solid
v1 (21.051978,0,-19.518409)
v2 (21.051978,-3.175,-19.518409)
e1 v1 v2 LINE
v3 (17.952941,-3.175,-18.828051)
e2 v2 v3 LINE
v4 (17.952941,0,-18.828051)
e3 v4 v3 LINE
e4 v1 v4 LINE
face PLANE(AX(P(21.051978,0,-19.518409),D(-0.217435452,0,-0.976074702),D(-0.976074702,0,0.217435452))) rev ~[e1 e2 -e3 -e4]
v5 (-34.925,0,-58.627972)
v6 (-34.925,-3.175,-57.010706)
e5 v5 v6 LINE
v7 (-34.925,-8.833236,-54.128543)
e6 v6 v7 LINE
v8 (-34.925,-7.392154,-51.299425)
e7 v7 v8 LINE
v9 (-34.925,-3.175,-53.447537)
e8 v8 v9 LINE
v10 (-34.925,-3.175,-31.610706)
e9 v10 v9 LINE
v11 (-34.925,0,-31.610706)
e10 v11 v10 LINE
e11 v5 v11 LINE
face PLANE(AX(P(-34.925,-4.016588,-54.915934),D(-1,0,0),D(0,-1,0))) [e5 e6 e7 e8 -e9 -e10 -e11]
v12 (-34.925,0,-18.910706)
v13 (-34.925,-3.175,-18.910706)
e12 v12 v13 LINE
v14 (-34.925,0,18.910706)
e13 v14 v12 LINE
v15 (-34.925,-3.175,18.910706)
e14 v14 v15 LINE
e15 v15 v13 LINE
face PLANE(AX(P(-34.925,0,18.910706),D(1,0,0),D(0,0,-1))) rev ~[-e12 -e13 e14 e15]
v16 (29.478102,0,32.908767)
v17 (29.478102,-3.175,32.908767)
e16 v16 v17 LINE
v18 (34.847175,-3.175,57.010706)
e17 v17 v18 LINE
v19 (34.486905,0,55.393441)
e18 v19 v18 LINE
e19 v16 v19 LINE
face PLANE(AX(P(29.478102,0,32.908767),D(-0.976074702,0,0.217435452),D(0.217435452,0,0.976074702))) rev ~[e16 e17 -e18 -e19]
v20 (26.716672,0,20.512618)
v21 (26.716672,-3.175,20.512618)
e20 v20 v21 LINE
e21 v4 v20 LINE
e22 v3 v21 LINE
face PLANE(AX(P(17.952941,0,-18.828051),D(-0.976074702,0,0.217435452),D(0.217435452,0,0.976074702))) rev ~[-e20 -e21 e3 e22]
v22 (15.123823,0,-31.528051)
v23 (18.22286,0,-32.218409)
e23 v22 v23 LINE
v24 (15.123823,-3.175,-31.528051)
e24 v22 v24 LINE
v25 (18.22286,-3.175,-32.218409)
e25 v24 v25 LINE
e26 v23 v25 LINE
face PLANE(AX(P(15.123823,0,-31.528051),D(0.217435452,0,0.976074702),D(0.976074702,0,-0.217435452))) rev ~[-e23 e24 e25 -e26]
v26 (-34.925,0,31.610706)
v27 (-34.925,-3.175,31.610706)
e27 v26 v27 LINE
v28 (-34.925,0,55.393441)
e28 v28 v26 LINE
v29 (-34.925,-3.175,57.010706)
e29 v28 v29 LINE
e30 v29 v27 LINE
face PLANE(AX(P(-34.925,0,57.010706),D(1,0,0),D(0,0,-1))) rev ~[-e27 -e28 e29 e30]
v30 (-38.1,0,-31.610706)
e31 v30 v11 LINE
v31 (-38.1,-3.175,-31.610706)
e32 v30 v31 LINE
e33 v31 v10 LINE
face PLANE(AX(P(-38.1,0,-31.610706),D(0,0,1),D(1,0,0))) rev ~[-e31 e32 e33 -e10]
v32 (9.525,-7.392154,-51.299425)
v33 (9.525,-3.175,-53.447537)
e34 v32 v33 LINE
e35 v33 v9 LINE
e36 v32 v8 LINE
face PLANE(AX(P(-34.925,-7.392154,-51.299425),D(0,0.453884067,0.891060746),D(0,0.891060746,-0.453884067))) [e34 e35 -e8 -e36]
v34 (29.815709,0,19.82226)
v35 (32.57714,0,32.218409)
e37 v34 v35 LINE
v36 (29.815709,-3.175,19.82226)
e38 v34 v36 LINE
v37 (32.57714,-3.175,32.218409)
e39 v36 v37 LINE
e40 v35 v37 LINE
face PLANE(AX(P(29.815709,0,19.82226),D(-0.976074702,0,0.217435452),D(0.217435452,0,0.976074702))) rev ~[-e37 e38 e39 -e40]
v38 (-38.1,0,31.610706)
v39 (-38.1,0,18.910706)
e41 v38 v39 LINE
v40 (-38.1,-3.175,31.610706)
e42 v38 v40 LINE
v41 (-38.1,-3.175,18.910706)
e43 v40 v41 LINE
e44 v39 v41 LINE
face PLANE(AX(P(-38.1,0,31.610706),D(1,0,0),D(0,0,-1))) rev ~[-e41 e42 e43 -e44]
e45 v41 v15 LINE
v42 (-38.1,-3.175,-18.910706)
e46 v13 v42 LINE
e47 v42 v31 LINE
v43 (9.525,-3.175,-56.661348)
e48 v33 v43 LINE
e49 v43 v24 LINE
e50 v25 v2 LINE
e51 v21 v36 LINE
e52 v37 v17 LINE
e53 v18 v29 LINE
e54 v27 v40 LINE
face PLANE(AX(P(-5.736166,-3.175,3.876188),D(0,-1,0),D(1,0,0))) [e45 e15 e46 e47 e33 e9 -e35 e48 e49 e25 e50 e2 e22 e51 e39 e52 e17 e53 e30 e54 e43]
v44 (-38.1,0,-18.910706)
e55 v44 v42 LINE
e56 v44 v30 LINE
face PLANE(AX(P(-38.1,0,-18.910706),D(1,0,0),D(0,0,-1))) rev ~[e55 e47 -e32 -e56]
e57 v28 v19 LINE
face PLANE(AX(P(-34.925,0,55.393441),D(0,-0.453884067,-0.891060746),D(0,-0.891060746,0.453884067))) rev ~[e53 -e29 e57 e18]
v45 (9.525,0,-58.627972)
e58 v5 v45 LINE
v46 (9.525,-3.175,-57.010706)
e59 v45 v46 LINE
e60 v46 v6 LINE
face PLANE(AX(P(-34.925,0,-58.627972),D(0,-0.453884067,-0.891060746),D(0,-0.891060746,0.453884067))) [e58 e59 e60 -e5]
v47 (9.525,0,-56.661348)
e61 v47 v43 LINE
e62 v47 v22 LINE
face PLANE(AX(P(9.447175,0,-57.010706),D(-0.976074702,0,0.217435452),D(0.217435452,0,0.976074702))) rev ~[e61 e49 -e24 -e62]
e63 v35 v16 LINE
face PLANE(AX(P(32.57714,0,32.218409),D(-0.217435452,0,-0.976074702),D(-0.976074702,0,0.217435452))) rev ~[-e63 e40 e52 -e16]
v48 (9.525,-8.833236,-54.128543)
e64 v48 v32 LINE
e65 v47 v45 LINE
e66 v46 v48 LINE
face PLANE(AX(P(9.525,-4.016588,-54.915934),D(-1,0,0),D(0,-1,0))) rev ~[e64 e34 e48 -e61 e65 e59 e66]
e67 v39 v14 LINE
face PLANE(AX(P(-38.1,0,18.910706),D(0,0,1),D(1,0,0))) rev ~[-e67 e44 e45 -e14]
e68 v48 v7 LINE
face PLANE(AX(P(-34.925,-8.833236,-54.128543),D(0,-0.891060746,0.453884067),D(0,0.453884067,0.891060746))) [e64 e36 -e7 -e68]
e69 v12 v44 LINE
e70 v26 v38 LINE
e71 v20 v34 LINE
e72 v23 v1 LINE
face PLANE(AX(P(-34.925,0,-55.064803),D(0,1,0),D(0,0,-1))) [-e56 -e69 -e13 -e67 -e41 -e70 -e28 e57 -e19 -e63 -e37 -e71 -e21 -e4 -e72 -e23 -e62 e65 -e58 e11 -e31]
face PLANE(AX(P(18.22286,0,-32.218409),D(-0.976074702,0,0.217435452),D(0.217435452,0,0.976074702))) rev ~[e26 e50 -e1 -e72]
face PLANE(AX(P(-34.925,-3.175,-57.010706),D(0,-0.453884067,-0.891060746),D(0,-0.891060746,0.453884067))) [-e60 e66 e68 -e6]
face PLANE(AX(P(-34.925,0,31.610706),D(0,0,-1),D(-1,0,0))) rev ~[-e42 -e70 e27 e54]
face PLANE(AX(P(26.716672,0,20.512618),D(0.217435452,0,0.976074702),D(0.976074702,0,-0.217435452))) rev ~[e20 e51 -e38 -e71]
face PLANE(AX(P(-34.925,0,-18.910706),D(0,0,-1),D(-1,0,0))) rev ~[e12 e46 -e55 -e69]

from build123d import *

# Parameters (mm, degrees)
F1_DEPTH = 3.175
F3_DEPTH = 43.942
F5_DEPTH = 76.2
F6_DEPTH = 44.45


# Not quite as in the source:
# - a feature names something its author has since deleted; it is built from what else it names


with BuildPart() as f1:
    # F0 (on Front) → F1 (new body)
    with BuildSketch(Plane.XZ):
        Polygon((-34.925, -57.0107064), (9.4471751978, -57.0107064), (15.1238233026, -31.5280514049), (18.2228604819, -32.2184089652), (21.0519782071, -19.5184089652), (17.9529410277, -18.8280514049), (26.7166720978, 20.512617808), (29.8157092771, 19.8222602477), (32.5771395181, 32.2184089652), (29.4781023387, 32.9087665254), (34.8471751978, 57.0107064), (-34.925, 57.0107064), (-34.925, 31.6107064), (-38.1, 31.6107064), (-38.1, 18.9107064), (-34.925, 18.9107064), (-34.925, -18.9107064), (-38.1, -18.9107064), (-38.1, -31.6107064), (-34.925, -31.6107064), align=None)
    extrude(amount=F1_DEPTH)

    # F2 (on face) → F3 (join)
    with BuildSketch(Plane(origin=(-34.925, 0, 0), x_dir=(0, -1, 0), z_dir=(-1, 0, 0))):
        Polygon((0, -58.6279720227), (3.175, -57.0107064), (8.8332357394, -54.1285425744), (7.3921538265, -51.2994247047), (0, -55.0648030547), align=None)
    extrude(amount=-F3_DEPTH)

    # F4 (on face) → F5 (cut)
    with BuildSketch(Plane(origin=(-34.925, 0, 0), x_dir=(0, -1, 0), z_dir=(-1, 0, 0))):
        Polygon((0, 55.3934407773), (3.175, 57.0107064), (0, 57.0107064), align=None)
    extrude(amount=-F5_DEPTH, mode=Mode.SUBTRACT)

    # F2 (on face) → F6 (join)
    with BuildSketch(Plane(origin=(-34.925, 0, 0), x_dir=(0, -1, 0), z_dir=(-1, 0, 0))):
        Polygon((0, -58.6279720227), (3.175, -57.0107064), (8.8332357394, -54.1285425744), (7.3921538265, -51.2994247047), (0, -55.0648030547), align=None)
    extrude(amount=-F6_DEPTH)


solid = f1.part
